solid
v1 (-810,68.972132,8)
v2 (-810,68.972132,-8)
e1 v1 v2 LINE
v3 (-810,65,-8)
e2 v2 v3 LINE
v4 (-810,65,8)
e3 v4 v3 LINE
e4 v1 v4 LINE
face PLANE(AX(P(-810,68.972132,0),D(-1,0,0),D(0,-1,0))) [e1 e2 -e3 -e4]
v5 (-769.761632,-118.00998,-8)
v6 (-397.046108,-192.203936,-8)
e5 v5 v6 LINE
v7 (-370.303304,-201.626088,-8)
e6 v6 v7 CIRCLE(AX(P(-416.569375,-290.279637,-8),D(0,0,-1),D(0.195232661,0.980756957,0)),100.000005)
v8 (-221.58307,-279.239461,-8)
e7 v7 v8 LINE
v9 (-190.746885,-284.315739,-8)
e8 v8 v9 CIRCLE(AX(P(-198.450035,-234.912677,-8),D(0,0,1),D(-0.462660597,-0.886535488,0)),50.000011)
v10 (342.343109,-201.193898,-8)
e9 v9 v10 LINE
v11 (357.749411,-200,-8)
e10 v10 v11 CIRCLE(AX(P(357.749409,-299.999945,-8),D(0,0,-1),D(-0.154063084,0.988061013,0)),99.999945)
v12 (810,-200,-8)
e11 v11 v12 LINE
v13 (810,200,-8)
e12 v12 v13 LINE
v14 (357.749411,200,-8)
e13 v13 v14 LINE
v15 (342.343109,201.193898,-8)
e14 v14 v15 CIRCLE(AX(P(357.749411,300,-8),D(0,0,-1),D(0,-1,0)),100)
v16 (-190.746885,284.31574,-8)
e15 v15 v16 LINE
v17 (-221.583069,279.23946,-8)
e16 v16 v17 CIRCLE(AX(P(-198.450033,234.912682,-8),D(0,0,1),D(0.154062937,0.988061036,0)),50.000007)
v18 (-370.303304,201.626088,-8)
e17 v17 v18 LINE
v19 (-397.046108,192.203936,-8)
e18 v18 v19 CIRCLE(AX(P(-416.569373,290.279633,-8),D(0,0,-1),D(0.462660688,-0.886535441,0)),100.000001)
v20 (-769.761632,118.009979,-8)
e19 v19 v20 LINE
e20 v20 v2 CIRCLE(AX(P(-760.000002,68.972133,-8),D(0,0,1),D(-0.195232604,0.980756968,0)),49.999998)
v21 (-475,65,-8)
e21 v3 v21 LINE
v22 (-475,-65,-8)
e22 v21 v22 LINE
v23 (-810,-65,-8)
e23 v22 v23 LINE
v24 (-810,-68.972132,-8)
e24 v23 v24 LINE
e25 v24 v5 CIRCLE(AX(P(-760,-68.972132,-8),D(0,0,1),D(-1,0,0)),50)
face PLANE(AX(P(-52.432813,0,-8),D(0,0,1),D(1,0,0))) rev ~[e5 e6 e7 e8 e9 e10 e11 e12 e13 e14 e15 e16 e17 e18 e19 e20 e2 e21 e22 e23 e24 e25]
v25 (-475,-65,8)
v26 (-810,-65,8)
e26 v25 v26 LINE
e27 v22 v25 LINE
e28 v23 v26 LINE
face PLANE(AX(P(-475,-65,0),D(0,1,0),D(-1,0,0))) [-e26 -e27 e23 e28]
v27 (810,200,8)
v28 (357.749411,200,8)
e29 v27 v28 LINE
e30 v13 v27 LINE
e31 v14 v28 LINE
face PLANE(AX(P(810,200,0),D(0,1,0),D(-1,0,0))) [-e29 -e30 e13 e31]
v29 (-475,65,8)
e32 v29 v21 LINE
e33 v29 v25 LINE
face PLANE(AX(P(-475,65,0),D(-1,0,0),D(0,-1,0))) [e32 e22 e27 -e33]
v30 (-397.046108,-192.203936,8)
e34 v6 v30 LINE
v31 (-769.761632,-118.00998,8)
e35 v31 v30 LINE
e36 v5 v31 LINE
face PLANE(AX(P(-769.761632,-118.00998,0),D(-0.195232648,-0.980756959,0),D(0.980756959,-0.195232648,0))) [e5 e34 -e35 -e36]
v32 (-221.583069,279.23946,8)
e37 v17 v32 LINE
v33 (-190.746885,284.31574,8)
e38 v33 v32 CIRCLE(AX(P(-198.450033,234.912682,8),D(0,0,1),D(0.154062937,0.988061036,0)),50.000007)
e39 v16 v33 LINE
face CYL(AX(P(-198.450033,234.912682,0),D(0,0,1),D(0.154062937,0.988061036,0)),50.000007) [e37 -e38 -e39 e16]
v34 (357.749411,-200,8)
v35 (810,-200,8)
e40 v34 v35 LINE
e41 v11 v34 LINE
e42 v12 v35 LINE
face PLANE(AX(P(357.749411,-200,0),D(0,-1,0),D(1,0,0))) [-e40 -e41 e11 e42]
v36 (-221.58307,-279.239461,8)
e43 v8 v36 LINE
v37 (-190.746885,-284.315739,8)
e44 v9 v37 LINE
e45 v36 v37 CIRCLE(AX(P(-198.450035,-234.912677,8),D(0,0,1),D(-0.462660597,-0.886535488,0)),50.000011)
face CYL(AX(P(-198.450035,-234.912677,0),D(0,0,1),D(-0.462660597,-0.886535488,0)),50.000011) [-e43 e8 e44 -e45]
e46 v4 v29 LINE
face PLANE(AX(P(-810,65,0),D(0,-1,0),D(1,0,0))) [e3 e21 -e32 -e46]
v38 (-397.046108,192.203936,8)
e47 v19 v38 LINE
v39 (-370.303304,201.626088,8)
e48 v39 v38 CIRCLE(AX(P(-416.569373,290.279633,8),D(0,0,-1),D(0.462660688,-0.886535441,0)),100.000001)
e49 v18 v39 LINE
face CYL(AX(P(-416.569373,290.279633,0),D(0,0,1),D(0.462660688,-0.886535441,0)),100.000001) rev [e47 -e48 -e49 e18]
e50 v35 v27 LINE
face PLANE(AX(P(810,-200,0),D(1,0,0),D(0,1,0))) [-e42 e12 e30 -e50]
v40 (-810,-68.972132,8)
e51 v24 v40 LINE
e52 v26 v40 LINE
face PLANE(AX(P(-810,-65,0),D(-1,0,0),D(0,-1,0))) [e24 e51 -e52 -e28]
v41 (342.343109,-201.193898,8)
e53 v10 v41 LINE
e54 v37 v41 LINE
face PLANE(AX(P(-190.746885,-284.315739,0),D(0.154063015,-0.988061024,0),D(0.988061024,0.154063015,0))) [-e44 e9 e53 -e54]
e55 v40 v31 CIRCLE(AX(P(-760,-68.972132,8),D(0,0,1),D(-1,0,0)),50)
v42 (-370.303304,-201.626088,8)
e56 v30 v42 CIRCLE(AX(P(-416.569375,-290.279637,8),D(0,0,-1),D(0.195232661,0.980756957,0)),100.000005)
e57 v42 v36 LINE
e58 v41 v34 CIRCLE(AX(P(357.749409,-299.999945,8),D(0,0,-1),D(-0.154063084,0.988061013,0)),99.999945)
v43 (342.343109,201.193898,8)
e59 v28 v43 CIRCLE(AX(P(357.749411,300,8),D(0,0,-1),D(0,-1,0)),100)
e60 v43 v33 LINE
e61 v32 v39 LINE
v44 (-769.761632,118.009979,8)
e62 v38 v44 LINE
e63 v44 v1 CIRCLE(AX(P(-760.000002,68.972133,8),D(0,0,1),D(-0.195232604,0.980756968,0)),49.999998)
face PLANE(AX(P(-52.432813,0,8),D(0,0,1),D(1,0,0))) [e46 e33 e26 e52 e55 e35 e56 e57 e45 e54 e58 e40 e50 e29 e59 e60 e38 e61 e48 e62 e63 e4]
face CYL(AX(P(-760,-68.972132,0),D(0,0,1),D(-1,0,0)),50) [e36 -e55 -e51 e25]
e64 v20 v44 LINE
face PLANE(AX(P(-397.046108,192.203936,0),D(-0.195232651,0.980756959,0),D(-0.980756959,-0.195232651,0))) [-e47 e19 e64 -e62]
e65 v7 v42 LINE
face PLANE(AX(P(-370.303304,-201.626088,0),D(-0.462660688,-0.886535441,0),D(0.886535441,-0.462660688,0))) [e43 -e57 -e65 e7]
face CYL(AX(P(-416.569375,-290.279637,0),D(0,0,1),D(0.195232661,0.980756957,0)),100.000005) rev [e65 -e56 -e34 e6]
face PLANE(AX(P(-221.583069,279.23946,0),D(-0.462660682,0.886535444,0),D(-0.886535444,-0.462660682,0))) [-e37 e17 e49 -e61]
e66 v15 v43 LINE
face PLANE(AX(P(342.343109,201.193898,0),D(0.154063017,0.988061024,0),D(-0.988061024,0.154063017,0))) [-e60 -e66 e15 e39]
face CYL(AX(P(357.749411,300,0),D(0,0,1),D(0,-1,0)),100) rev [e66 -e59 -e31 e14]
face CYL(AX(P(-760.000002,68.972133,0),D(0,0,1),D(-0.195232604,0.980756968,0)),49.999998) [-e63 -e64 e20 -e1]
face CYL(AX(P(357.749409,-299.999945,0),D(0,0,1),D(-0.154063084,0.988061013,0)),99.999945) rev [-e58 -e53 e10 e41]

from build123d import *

# Parameters (mm, degrees)
F1_DEPTH = 8


# Not quite as in the source:
# - ends of sketch curves that miss each other by under 0.0002 mm in the source are joined


with BuildPart() as f1:
    # F0 (on Top) → F1 (new body, symmetric)
    with BuildSketch(Plane.XY):
        with BuildLine():
            Line((-475, 65), (-475, -65))
            Line((-475, -65), (-810, -65))
            Line((-810, -65), (-810, -68.972132))
            ThreePointArc((-810, -68.972132), (-798.6528240235, -100.6889917911), (-769.7616321997, -118.0099800033))
            Line((-769.7616321997, -118.0099800033), (-397.046108, -192.203936))
            ThreePointArc((-397.046108, -192.203936), (-383.3390652577, -195.9623660974), (-370.3033040103, -201.6260880198))
            Line((-370.3033040103, -201.6260880198), (-221.58307, -279.239461))
            ThreePointArc((-221.58307, -279.239461), (-206.5717643435, -284.2486537093), (-190.746885103, -284.3157393396))
            Line((-190.746885103, -284.3157393396), (342.343109, -201.193898))
            ThreePointArc((342.343109, -201.193898), (350.023164587, -200.2989211876), (357.749411, -200))
            Line((357.749411, -200), (810, -200))
            Line((810, -200), (810, 200))
            Line((810, 200), (357.749411, 200))
            ThreePointArc((357.749411, 200), (350.023164587, 200.2989211876), (342.343108949, 201.1938976727))
            Line((342.343108949, 201.1938976727), (-190.746885, 284.31574))
            ThreePointArc((-190.746885, 284.31574), (-206.5717643435, 284.2486537093), (-221.5830694776, 279.2394599991))
            Line((-221.5830694776, 279.2394599991), (-370.303304, 201.626088))
            ThreePointArc((-370.303304, 201.626088), (-383.3390652577, 195.9623660974), (-397.0461080216, 192.2039361086))
            Line((-397.0461080216, 192.2039361086), (-769.761632, 118.009979))
            ThreePointArc((-769.761632, 118.009979), (-798.6528240235, 100.6889917911), (-810, 68.972132))
            Line((-810, 68.972132), (-810, 65))
            Line((-810, 65), (-475, 65))
        make_face()
    extrude(amount=F1_DEPTH, both=True)


solid = f1.part
